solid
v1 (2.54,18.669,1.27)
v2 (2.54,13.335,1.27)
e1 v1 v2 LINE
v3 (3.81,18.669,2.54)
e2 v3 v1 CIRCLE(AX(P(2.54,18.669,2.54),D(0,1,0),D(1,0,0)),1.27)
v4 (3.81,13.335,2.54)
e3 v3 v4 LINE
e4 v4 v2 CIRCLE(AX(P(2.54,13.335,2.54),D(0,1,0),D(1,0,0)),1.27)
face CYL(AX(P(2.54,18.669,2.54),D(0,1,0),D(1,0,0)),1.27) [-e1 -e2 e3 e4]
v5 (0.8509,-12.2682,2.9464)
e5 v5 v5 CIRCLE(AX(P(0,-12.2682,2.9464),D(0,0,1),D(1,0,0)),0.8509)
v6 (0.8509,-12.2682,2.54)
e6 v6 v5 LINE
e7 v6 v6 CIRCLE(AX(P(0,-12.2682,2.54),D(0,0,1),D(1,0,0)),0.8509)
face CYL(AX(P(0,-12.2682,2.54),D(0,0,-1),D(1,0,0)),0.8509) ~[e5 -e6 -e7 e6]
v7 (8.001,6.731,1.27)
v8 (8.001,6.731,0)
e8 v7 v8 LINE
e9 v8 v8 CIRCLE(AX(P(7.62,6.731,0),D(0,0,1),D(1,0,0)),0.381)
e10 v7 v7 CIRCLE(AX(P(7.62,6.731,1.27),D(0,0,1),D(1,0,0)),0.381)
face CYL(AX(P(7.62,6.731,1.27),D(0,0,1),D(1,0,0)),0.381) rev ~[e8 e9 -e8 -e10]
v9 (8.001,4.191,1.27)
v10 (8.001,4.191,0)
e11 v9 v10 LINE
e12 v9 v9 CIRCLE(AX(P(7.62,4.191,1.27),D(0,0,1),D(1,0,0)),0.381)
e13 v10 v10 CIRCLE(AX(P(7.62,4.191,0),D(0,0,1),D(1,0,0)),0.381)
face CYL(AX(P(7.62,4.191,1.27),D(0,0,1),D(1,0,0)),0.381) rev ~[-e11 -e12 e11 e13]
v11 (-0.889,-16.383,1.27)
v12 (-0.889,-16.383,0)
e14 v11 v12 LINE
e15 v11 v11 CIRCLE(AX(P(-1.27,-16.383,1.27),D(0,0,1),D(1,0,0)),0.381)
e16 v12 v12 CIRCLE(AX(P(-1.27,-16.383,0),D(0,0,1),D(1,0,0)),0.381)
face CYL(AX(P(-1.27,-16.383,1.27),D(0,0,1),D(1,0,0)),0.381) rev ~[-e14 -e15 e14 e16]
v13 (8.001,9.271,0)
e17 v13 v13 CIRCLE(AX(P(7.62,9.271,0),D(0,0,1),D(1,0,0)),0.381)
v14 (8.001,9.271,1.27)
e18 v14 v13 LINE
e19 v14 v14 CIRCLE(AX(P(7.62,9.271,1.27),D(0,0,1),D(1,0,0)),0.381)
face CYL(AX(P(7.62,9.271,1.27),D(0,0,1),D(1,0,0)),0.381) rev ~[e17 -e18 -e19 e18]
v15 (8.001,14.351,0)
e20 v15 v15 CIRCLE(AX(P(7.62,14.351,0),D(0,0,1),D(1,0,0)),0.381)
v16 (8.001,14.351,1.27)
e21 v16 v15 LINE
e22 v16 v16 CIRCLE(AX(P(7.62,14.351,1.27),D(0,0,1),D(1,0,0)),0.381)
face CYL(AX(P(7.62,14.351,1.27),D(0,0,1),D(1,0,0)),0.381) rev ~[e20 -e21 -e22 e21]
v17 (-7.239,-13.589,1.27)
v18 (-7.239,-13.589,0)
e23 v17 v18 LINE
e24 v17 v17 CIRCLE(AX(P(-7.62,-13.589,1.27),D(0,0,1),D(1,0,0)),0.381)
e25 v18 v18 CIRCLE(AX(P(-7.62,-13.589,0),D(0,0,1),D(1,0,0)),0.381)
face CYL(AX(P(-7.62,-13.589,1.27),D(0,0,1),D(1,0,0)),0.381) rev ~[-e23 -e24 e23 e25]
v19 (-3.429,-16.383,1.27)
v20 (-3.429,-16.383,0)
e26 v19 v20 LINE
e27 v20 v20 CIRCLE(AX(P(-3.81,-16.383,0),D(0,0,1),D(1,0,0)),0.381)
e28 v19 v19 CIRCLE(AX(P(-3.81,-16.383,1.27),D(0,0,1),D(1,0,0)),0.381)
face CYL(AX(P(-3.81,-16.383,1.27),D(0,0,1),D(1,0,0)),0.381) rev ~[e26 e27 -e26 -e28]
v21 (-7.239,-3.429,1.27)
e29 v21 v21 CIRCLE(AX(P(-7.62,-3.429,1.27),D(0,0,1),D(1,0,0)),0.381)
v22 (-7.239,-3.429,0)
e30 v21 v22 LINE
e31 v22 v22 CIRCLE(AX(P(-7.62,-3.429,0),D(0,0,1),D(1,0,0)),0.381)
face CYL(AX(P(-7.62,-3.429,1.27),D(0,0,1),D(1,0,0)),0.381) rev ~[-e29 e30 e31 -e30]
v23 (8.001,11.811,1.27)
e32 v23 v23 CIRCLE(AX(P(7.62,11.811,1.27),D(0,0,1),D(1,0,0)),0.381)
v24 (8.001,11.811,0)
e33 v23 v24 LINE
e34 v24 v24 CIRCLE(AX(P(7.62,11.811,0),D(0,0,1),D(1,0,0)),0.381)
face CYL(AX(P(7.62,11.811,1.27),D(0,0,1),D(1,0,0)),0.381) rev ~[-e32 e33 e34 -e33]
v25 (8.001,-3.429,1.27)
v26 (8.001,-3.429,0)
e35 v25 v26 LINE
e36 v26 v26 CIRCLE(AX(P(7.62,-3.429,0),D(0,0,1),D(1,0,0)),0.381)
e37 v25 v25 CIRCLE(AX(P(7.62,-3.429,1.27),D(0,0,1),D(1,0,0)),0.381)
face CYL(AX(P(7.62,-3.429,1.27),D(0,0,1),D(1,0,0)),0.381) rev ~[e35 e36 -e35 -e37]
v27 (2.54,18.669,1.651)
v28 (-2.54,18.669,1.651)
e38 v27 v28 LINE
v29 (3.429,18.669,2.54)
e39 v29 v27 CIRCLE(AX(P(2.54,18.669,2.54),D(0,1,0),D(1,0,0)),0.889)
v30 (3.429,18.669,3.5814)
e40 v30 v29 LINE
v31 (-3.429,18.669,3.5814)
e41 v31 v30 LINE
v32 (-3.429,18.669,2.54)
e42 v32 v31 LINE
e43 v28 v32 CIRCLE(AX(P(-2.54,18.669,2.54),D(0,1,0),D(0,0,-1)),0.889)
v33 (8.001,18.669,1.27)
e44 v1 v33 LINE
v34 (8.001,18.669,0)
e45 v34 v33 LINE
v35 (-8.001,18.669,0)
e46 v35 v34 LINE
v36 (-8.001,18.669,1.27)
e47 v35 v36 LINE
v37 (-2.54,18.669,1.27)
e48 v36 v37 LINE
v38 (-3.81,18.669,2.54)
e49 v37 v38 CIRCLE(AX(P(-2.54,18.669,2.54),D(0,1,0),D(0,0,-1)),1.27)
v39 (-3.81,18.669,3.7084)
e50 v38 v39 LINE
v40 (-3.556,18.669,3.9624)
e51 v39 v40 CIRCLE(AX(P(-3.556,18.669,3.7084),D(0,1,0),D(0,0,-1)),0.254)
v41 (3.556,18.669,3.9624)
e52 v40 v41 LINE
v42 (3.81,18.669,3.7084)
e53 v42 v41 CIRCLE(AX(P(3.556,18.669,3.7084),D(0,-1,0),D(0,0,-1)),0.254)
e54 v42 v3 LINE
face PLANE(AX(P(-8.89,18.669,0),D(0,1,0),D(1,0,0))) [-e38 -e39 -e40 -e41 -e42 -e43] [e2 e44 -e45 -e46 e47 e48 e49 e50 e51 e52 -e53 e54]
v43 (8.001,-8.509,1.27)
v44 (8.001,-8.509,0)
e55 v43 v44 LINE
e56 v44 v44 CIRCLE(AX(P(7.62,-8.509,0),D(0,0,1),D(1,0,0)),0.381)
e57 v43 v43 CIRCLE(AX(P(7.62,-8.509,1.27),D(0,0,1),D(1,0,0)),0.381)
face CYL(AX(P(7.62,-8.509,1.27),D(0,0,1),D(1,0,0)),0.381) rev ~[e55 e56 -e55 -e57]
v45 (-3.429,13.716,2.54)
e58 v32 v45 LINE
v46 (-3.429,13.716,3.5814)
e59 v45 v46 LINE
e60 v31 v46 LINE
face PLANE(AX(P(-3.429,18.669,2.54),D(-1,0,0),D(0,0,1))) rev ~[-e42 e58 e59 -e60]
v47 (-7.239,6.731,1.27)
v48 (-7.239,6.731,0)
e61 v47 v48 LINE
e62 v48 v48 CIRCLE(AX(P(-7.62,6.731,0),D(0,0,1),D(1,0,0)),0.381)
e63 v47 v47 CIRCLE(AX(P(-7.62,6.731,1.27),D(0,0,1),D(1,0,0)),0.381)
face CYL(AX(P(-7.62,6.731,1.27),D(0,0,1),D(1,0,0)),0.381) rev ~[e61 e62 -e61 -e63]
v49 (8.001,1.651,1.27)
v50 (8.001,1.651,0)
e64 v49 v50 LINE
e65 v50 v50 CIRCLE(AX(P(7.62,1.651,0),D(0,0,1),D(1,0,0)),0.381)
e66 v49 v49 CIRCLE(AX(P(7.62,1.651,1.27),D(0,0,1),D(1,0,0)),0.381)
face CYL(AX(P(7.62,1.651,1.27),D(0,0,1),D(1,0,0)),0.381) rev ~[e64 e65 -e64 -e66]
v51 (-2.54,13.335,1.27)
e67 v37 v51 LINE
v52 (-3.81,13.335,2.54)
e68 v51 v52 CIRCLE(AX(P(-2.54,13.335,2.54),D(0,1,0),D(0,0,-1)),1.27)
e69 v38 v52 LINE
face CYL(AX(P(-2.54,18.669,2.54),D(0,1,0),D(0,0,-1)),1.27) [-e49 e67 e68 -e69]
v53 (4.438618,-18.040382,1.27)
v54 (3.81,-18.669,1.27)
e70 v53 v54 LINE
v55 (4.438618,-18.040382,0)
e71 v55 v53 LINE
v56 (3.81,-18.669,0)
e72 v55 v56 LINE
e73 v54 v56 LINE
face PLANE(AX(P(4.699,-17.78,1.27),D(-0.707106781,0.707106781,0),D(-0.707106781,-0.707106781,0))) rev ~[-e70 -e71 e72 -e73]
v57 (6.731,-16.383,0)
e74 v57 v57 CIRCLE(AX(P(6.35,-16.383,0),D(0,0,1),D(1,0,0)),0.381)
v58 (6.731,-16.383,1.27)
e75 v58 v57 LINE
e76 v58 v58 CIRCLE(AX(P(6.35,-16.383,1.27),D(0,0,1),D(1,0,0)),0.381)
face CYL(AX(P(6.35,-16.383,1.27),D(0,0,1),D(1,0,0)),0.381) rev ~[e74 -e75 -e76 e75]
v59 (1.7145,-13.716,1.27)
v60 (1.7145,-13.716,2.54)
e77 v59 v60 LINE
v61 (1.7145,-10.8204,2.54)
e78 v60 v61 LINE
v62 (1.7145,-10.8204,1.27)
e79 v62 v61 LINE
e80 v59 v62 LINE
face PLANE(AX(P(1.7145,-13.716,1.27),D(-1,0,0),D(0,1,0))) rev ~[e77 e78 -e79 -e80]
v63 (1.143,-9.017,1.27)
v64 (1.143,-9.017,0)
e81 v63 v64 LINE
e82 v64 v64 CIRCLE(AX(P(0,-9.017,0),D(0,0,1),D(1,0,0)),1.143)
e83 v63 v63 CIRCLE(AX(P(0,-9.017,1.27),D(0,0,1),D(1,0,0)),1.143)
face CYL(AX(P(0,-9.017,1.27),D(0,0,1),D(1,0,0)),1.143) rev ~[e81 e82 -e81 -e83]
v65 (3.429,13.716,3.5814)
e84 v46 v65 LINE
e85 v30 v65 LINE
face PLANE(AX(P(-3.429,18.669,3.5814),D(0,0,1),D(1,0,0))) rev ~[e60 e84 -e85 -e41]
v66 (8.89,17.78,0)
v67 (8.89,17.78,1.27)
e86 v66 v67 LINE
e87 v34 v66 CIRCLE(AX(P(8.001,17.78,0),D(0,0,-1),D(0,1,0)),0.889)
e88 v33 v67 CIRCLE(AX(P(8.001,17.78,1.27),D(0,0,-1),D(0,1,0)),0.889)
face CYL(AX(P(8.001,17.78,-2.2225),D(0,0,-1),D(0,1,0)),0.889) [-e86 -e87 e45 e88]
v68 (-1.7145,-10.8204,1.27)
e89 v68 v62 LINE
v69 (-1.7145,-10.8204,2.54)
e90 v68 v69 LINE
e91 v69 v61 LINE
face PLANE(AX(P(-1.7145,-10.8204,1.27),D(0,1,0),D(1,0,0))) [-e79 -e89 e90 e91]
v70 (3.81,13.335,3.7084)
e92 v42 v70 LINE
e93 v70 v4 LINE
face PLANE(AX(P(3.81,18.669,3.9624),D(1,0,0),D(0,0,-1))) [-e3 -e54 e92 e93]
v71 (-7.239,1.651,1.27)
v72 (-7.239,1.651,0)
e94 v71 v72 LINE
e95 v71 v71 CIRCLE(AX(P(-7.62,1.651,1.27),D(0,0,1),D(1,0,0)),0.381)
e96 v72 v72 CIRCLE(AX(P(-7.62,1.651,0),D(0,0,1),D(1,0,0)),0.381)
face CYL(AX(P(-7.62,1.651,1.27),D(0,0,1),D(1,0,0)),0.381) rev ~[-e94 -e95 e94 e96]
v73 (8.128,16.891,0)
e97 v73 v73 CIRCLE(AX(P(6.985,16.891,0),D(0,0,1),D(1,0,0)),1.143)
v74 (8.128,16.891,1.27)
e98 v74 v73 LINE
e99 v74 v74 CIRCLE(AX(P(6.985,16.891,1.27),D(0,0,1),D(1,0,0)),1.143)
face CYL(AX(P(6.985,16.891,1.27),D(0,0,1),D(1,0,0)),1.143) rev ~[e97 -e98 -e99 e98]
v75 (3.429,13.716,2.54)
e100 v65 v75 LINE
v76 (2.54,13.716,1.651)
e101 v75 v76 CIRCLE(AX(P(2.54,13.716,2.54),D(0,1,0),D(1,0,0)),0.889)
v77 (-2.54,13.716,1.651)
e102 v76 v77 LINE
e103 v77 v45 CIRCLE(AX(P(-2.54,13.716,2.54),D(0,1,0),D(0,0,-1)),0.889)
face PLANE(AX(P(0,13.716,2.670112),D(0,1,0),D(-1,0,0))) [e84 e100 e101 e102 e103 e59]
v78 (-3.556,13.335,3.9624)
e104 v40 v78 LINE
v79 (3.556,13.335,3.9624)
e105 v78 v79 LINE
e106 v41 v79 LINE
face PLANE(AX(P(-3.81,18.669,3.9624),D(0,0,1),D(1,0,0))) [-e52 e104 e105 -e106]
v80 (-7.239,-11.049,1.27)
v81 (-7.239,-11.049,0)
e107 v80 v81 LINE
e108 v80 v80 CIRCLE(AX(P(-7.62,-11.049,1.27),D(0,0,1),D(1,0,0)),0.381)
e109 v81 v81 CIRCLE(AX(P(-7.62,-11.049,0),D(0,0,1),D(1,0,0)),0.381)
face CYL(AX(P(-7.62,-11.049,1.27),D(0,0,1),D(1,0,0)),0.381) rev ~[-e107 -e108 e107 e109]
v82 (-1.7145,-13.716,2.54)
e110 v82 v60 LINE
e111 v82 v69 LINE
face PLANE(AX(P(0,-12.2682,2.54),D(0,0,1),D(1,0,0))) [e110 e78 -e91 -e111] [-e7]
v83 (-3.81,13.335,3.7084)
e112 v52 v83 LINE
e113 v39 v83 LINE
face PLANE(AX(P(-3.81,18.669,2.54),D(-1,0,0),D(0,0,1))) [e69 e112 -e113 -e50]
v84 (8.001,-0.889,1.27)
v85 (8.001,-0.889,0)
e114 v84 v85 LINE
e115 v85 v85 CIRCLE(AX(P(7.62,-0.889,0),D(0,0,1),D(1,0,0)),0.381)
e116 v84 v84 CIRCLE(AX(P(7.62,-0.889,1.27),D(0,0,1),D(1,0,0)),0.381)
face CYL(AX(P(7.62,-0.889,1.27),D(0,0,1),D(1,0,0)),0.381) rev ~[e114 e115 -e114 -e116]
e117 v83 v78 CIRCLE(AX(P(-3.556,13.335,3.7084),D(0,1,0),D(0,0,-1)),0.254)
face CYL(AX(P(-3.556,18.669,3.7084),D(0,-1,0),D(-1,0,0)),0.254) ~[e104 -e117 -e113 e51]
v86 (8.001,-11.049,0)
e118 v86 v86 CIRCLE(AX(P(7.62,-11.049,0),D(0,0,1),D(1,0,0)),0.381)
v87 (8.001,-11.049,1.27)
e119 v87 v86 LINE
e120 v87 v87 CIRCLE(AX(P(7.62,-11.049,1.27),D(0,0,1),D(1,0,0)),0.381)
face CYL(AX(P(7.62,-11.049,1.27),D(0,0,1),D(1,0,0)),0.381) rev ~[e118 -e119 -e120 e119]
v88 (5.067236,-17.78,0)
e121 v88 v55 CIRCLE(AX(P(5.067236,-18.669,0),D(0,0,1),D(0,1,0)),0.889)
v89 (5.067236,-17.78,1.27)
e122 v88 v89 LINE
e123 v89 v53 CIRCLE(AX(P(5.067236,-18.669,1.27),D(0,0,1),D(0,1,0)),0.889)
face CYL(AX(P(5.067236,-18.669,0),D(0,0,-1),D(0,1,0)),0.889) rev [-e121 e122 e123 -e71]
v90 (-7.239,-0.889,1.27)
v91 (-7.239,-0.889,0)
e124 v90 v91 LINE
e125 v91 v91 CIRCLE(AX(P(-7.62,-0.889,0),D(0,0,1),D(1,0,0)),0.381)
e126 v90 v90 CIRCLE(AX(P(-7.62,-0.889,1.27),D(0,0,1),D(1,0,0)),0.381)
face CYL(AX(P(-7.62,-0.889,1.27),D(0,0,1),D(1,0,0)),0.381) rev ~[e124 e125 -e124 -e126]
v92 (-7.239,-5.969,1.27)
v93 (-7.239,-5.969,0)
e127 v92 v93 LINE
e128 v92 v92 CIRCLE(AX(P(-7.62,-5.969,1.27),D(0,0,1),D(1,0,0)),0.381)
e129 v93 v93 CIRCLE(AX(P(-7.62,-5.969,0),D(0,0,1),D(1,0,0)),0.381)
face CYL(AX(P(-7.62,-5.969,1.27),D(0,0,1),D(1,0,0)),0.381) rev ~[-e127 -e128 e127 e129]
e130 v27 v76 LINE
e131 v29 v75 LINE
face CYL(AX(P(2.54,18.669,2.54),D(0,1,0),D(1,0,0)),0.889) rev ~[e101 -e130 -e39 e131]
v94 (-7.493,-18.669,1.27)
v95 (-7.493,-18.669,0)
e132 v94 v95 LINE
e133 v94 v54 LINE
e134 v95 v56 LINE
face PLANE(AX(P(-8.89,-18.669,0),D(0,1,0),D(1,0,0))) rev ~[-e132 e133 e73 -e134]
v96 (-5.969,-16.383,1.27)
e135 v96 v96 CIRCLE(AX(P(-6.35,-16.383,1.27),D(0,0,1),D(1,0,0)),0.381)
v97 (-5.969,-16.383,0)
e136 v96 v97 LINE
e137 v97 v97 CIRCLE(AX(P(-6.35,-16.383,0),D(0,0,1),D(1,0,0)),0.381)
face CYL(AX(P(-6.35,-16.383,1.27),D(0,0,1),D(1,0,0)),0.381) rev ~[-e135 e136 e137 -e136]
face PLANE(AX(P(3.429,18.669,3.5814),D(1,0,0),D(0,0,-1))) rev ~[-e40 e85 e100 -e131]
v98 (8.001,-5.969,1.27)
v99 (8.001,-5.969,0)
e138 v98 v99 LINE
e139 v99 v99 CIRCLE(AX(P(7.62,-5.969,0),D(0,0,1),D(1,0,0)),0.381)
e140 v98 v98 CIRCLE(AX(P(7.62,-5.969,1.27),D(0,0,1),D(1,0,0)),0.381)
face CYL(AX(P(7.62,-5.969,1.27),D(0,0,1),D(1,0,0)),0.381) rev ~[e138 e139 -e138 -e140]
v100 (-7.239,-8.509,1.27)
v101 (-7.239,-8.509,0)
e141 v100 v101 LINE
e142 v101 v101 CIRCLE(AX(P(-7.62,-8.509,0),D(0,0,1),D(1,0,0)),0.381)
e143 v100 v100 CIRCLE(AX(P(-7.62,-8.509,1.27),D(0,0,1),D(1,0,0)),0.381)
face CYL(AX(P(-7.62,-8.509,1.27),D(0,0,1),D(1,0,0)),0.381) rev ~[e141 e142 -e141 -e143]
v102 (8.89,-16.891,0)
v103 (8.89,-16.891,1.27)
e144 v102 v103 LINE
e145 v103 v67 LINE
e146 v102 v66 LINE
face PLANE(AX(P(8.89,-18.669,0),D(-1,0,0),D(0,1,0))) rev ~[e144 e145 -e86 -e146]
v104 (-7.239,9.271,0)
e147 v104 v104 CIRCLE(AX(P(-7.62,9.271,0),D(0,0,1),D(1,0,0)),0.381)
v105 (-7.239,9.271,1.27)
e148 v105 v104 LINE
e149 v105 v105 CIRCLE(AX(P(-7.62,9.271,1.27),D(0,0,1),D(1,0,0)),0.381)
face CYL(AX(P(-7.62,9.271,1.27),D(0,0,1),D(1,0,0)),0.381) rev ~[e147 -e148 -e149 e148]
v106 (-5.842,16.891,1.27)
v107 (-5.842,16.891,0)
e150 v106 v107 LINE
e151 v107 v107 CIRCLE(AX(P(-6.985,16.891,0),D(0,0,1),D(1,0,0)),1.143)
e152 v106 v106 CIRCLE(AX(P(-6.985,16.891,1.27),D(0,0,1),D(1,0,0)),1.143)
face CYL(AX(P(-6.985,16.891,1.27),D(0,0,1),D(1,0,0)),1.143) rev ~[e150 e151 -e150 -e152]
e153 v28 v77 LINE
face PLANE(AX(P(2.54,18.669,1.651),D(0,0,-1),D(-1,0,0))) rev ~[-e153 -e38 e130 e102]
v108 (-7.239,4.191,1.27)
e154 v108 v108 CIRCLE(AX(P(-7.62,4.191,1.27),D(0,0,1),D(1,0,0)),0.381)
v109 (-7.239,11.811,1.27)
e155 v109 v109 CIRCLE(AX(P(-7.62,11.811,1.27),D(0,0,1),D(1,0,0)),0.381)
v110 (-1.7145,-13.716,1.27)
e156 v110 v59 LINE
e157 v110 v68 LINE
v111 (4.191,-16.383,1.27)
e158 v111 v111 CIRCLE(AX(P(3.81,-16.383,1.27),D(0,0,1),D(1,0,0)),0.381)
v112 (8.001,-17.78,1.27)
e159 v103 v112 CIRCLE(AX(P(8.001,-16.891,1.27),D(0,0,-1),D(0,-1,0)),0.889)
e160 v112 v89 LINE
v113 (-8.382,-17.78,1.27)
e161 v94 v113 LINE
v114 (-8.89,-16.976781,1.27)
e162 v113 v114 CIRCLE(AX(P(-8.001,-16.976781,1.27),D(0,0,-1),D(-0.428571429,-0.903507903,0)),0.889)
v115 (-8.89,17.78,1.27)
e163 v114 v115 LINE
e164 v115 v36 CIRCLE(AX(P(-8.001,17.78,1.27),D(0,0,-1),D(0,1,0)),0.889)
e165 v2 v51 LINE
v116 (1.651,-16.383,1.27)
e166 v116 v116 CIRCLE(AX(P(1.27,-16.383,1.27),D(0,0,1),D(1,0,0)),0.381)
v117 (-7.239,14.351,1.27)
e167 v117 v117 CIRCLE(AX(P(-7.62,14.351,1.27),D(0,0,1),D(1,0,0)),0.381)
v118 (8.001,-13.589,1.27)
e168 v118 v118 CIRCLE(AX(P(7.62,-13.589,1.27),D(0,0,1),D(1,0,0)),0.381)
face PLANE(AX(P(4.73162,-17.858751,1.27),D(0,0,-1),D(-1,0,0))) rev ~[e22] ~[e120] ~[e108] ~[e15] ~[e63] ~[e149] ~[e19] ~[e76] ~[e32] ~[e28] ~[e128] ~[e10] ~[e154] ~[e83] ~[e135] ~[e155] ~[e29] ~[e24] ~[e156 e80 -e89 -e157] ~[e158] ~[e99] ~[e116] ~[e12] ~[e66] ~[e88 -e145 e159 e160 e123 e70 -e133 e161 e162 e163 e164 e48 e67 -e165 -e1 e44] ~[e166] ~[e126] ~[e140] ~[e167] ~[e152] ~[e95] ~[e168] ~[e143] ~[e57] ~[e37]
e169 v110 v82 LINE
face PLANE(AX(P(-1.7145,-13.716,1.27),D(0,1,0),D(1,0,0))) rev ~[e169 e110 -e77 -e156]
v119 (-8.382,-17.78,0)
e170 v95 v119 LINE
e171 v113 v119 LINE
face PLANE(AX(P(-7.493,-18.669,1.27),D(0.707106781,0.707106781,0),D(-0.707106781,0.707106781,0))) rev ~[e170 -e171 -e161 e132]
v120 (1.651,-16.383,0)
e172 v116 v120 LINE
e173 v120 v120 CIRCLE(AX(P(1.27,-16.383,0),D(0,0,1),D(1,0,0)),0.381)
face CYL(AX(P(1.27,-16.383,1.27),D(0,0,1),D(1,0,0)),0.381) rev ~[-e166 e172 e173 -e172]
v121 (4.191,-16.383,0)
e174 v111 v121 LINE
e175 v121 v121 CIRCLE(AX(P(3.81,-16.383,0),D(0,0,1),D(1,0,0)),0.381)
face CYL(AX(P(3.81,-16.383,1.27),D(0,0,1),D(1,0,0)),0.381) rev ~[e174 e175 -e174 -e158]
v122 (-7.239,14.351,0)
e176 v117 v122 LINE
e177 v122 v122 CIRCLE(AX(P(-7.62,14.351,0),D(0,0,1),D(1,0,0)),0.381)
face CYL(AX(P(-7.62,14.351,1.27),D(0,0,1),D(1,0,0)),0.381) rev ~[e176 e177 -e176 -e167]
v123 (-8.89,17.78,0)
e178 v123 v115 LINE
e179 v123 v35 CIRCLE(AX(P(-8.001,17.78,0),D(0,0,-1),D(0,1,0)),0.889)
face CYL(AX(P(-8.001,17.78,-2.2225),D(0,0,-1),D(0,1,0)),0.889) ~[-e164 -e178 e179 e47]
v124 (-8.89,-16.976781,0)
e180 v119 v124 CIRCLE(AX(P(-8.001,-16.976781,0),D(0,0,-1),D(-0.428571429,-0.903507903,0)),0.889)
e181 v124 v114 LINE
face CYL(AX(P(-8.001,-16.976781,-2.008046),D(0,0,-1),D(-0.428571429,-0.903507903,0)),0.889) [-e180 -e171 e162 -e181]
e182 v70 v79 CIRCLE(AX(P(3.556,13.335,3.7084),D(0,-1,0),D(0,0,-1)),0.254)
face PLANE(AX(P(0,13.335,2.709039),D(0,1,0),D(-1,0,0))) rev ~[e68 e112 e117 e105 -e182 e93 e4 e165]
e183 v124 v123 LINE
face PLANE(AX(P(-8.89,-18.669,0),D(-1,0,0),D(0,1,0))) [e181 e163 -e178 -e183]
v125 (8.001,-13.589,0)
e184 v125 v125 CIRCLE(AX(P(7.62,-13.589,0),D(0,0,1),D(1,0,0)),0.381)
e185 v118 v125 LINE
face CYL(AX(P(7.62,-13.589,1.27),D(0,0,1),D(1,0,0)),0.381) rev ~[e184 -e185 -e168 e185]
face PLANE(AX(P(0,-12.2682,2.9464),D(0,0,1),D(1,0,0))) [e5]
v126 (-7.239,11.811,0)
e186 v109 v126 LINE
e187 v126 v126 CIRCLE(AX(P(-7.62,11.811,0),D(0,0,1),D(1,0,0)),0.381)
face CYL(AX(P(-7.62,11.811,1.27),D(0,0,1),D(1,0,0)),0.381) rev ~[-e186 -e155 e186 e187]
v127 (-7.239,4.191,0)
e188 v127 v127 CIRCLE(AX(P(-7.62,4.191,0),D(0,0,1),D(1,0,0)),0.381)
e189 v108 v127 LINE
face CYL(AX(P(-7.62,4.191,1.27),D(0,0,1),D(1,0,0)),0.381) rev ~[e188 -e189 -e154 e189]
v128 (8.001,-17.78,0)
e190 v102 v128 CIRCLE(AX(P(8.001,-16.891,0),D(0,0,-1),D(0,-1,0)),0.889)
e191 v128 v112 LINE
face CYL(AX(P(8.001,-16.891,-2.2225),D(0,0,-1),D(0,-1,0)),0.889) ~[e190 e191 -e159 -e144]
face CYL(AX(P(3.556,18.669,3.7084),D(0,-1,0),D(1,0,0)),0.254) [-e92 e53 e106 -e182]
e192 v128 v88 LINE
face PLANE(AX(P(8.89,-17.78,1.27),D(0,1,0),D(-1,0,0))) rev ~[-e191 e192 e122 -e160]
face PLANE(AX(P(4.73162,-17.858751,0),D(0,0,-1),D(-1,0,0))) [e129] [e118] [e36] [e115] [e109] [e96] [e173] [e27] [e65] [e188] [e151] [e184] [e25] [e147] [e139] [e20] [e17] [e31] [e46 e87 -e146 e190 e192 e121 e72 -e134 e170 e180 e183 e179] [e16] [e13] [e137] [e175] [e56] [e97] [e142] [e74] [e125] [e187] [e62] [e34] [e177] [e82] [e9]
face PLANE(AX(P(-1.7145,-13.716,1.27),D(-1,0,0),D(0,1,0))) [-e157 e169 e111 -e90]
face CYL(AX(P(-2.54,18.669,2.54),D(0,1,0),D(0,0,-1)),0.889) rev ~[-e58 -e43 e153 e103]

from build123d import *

# Parameters (mm, degrees)
F0_W        = 17.78
F0_H        = 37.338
F1_DEPTH    = 1.27
F2_R        = 1.143
F3_DEPTH    = 1.27
F5_DEPTH    = 25.4
F6_T1_DEPTH = 1.27
F6_T3_DEPTH = 5.715
F6_T5_DEPTH = 5.715
F6_T7_DEPTH = 5.715
F6_T9_DEPTH = 5.2860926284
F8_DEPTH    = 5.334
F9_R        = 0.381
F10_DEPTH   = 1.27
F11_R       = 0.381
F12_DEPTH   = 1.27
F14_DEPTH   = 4.953
F15_R       = 0.254
F16_W       = 3.429
F16_H       = 2.8956
F17_DEPTH   = 1.27
F18_R       = 0.8509
F19_DEPTH   = 0.4064


# Not quite as in the source:
# - a fillet or chamfer that OpenCascade refuses, or shapes differently, is made with other operations: its cross-section is extruded or revolved along the edge and cut away or added


with BuildPart() as f1:
    # F0 (on Top) → F1 (new body)
    with BuildSketch(Plane.XY):
        Rectangle(F0_W, F0_H)
    extrude(amount=F1_DEPTH)

    # F2 (on face) → F3 (cut, through all)
    with BuildSketch(Plane.XY.offset(1.27)):
        with Locations((6.985, 16.891)):
            Circle(F2_R)
        with Locations((-6.985, 16.891)):
            Circle(F2_R)
        with Locations((0, -9.017)):
            Circle(F2_R)
    extrude(amount=-F3_DEPTH, mode=Mode.SUBTRACT)

    # F4 (on face) → F5 (cut)
    with BuildSketch(Plane.XY.offset(1.27)):
        Polygon((-8.89, -17.78), (-8.89, -18.669), (-7.493, -18.669), (-8.382, -17.78), align=None)
        Polygon((8.89, -18.669), (8.89, -17.78), (4.699, -17.78), (3.81, -18.669), align=None)
    extrude(amount=-F5_DEPTH, mode=Mode.SUBTRACT)

    # F6: fillet of radius 0.889 on 5 edges, made by hand

    # F6_s2 → F6_t1 (join)
    with BuildSketch(Plane.XY):
        with BuildLine():
            ThreePointArc((5.0672358569, -17.78), (4.7270302856, -17.8476710956), (4.4386179285, -18.0403820715))
            Line((4.4386179285, -18.0403820715), (4.699, -17.78))
            Line((4.699, -17.78), (5.0672358569, -17.78))
        make_face()
    extrude(amount=F6_T1_DEPTH)

    # F6_s4 → F6_t3 (cut)
    with BuildSketch(Plane.XY.offset(-2.2225)):
        with BuildLine():
            ThreePointArc((8.001, 18.669), (8.6296179285, 18.4086179285), (8.89, 17.78))
            Line((8.89, 17.78), (8.89, 18.669))
            Line((8.89, 18.669), (8.001, 18.669))
        make_face()
    extrude(amount=F6_T3_DEPTH, mode=Mode.SUBTRACT)

    # F6_s6 → F6_t5 (cut)
    with BuildSketch(Plane.XY.offset(-2.2225)):
        with BuildLine():
            ThreePointArc((-8.001, 18.669), (-8.6296179285, 18.4086179285), (-8.89, 17.78))
            Line((-8.89, 17.78), (-8.89, 18.669))
            Line((-8.89, 18.669), (-8.001, 18.669))
        make_face()
    extrude(amount=F6_T5_DEPTH, mode=Mode.SUBTRACT)

    # F6_s8 → F6_t7 (cut)
    with BuildSketch(Plane.XY.offset(-2.2225)):
        with BuildLine():
            ThreePointArc((8.001, -17.78), (8.6296179285, -17.5196179285), (8.89, -16.891))
            Line((8.89, -16.891), (8.89, -17.78))
            Line((8.89, -17.78), (8.001, -17.78))
        make_face()
    extrude(amount=F6_T7_DEPTH, mode=Mode.SUBTRACT)

    # F6_s10 → F6_t9 (cut)
    with BuildSketch(Plane.XY.offset(-2.0080463142)):
        with BuildLine():
            ThreePointArc((-8.382, -17.78), (-8.7523421325, -17.4519719624), (-8.89, -16.9767814743))
            Line((-8.89, -16.9767814743), (-8.89, -17.78))
            Line((-8.89, -17.78), (-8.382, -17.78))
        make_face()
    extrude(amount=F6_T9_DEPTH, mode=Mode.SUBTRACT)

    # F7 (on face) → F8 (join)
    with BuildSketch(Plane(origin=(0, 18.669, 0), x_dir=(-1, 0, 0), z_dir=(0, 1, 0))):
        with BuildLine():
            Line((3.81, 3.9624), (0, 3.9624))
            Line((0, 3.9624), (-3.81, 3.9624))
            Line((-3.81, 3.9624), (-3.81, 2.54))
            ThreePointArc((-3.81, 2.54), (-3.4380256121, 1.6419743879), (-2.54, 1.27))
            Line((-2.54, 1.27), (0, 1.27))
            Line((0, 1.27), (2.54, 1.27))
            ThreePointArc((2.54, 1.27), (3.4380256121, 1.6419743879), (3.81, 2.54))
            Line((3.81, 2.54), (3.81, 3.9624))
        make_face()
    extrude(amount=-F8_DEPTH)

    # F9 (on face) → F10 (cut, through all)
    with BuildSketch(Plane.XY.offset(1.27)):
        with Locations((7.62, 14.351)):
            Circle(F9_R)
        with Locations((7.62, 11.811)):
            Circle(F9_R)
        with Locations((7.62, 9.271)):
            Circle(F9_R)
        with Locations((7.62, 6.731)):
            Circle(F9_R)
        with Locations((7.62, 4.191)):
            Circle(F9_R)
        with Locations((7.62, 1.651)):
            Circle(F9_R)
        with Locations((7.62, -0.889)):
            Circle(F9_R)
        with Locations((7.62, -3.429)):
            Circle(F9_R)
        with Locations((7.62, -5.969)):
            Circle(F9_R)
        with Locations((7.62, -8.509)):
            Circle(F9_R)
        with Locations((7.62, -11.049)):
            Circle(F9_R)
        with Locations((7.62, -13.589)):
            Circle(F9_R)
        with Locations((-7.62, -13.589)):
            Circle(F9_R)
        with Locations((-7.62, -11.049)):
            Circle(F9_R)
        with Locations((-7.62, -8.509)):
            Circle(F9_R)
        with Locations((-7.62, -5.969)):
            Circle(F9_R)
        with Locations((-7.62, -3.429)):
            Circle(F9_R)
        with Locations((-7.62, -0.889)):
            Circle(F9_R)
        with Locations((-7.62, 1.651)):
            Circle(F9_R)
        with Locations((-7.62, 4.191)):
            Circle(F9_R)
        with Locations((-7.62, 6.731)):
            Circle(F9_R)
        with Locations((-7.62, 9.271)):
            Circle(F9_R)
        with Locations((-7.62, 11.811)):
            Circle(F9_R)
        with Locations((-7.62, 14.351)):
            Circle(F9_R)
    extrude(amount=-F10_DEPTH, mode=Mode.SUBTRACT)

    # F11 (on face) → F12 (cut, through all)
    with BuildSketch(Plane.XY.offset(1.27)):
        with Locations((-6.35, -16.383)):
            Circle(F11_R)
        with Locations((-3.81, -16.383)):
            Circle(F11_R)
        with Locations((-1.27, -16.383)):
            Circle(F11_R)
        with Locations((1.27, -16.383)):
            Circle(F11_R)
        with Locations((3.81, -16.383)):
            Circle(F11_R)
        with Locations((6.35, -16.383)):
            Circle(F11_R)
    extrude(amount=-F12_DEPTH, mode=Mode.SUBTRACT)

    # F13 (on face) → F14 (cut, through all)
    with BuildSketch(Plane(origin=(0, 18.669, 0), x_dir=(-1, 0, 0), z_dir=(0, 1, 0))):
        with BuildLine():
            Line((-2.54, 1.6509998994), (2.54, 1.6509998994))
            ThreePointArc((2.54, 1.6509998994), (3.1686179996, 1.9113820004), (3.4290001006, 2.54))
            Line((3.4290001006, 2.54), (3.4290001006, 3.5814001006))
            Line((3.4290001006, 3.5814001006), (-3.4290001006, 3.5814001006))
            Line((-3.4290001006, 3.5814001006), (-3.4290001006, 2.54))
            ThreePointArc((-3.4290001006, 2.54), (-3.1686179996, 1.9113820004), (-2.54, 1.6509998994))
        make_face()
    extrude(amount=-F14_DEPTH, mode=Mode.SUBTRACT)

    # F15
    f15_edges = [f1.edges().sort_by_distance(p)[0] for p in [
        (3.81, 16.002, 3.9624),
        (-3.81, 16.002, 3.9624),
    ]]
    fillet(f15_edges, radius=F15_R)

    # F16 (on face) → F17 (join)
    with BuildSketch(Plane.XY.offset(1.27)):
        with Locations((0, -12.2682)):
            Rectangle(F16_W, F16_H)
    extrude(amount=F17_DEPTH)

    # F18 (on face) → F19 (join)
    with BuildSketch(Plane.XY.offset(2.54)):
        with Locations((0, -12.2682)):
            Circle(F18_R)
    extrude(amount=F19_DEPTH)


solid = f1.part
